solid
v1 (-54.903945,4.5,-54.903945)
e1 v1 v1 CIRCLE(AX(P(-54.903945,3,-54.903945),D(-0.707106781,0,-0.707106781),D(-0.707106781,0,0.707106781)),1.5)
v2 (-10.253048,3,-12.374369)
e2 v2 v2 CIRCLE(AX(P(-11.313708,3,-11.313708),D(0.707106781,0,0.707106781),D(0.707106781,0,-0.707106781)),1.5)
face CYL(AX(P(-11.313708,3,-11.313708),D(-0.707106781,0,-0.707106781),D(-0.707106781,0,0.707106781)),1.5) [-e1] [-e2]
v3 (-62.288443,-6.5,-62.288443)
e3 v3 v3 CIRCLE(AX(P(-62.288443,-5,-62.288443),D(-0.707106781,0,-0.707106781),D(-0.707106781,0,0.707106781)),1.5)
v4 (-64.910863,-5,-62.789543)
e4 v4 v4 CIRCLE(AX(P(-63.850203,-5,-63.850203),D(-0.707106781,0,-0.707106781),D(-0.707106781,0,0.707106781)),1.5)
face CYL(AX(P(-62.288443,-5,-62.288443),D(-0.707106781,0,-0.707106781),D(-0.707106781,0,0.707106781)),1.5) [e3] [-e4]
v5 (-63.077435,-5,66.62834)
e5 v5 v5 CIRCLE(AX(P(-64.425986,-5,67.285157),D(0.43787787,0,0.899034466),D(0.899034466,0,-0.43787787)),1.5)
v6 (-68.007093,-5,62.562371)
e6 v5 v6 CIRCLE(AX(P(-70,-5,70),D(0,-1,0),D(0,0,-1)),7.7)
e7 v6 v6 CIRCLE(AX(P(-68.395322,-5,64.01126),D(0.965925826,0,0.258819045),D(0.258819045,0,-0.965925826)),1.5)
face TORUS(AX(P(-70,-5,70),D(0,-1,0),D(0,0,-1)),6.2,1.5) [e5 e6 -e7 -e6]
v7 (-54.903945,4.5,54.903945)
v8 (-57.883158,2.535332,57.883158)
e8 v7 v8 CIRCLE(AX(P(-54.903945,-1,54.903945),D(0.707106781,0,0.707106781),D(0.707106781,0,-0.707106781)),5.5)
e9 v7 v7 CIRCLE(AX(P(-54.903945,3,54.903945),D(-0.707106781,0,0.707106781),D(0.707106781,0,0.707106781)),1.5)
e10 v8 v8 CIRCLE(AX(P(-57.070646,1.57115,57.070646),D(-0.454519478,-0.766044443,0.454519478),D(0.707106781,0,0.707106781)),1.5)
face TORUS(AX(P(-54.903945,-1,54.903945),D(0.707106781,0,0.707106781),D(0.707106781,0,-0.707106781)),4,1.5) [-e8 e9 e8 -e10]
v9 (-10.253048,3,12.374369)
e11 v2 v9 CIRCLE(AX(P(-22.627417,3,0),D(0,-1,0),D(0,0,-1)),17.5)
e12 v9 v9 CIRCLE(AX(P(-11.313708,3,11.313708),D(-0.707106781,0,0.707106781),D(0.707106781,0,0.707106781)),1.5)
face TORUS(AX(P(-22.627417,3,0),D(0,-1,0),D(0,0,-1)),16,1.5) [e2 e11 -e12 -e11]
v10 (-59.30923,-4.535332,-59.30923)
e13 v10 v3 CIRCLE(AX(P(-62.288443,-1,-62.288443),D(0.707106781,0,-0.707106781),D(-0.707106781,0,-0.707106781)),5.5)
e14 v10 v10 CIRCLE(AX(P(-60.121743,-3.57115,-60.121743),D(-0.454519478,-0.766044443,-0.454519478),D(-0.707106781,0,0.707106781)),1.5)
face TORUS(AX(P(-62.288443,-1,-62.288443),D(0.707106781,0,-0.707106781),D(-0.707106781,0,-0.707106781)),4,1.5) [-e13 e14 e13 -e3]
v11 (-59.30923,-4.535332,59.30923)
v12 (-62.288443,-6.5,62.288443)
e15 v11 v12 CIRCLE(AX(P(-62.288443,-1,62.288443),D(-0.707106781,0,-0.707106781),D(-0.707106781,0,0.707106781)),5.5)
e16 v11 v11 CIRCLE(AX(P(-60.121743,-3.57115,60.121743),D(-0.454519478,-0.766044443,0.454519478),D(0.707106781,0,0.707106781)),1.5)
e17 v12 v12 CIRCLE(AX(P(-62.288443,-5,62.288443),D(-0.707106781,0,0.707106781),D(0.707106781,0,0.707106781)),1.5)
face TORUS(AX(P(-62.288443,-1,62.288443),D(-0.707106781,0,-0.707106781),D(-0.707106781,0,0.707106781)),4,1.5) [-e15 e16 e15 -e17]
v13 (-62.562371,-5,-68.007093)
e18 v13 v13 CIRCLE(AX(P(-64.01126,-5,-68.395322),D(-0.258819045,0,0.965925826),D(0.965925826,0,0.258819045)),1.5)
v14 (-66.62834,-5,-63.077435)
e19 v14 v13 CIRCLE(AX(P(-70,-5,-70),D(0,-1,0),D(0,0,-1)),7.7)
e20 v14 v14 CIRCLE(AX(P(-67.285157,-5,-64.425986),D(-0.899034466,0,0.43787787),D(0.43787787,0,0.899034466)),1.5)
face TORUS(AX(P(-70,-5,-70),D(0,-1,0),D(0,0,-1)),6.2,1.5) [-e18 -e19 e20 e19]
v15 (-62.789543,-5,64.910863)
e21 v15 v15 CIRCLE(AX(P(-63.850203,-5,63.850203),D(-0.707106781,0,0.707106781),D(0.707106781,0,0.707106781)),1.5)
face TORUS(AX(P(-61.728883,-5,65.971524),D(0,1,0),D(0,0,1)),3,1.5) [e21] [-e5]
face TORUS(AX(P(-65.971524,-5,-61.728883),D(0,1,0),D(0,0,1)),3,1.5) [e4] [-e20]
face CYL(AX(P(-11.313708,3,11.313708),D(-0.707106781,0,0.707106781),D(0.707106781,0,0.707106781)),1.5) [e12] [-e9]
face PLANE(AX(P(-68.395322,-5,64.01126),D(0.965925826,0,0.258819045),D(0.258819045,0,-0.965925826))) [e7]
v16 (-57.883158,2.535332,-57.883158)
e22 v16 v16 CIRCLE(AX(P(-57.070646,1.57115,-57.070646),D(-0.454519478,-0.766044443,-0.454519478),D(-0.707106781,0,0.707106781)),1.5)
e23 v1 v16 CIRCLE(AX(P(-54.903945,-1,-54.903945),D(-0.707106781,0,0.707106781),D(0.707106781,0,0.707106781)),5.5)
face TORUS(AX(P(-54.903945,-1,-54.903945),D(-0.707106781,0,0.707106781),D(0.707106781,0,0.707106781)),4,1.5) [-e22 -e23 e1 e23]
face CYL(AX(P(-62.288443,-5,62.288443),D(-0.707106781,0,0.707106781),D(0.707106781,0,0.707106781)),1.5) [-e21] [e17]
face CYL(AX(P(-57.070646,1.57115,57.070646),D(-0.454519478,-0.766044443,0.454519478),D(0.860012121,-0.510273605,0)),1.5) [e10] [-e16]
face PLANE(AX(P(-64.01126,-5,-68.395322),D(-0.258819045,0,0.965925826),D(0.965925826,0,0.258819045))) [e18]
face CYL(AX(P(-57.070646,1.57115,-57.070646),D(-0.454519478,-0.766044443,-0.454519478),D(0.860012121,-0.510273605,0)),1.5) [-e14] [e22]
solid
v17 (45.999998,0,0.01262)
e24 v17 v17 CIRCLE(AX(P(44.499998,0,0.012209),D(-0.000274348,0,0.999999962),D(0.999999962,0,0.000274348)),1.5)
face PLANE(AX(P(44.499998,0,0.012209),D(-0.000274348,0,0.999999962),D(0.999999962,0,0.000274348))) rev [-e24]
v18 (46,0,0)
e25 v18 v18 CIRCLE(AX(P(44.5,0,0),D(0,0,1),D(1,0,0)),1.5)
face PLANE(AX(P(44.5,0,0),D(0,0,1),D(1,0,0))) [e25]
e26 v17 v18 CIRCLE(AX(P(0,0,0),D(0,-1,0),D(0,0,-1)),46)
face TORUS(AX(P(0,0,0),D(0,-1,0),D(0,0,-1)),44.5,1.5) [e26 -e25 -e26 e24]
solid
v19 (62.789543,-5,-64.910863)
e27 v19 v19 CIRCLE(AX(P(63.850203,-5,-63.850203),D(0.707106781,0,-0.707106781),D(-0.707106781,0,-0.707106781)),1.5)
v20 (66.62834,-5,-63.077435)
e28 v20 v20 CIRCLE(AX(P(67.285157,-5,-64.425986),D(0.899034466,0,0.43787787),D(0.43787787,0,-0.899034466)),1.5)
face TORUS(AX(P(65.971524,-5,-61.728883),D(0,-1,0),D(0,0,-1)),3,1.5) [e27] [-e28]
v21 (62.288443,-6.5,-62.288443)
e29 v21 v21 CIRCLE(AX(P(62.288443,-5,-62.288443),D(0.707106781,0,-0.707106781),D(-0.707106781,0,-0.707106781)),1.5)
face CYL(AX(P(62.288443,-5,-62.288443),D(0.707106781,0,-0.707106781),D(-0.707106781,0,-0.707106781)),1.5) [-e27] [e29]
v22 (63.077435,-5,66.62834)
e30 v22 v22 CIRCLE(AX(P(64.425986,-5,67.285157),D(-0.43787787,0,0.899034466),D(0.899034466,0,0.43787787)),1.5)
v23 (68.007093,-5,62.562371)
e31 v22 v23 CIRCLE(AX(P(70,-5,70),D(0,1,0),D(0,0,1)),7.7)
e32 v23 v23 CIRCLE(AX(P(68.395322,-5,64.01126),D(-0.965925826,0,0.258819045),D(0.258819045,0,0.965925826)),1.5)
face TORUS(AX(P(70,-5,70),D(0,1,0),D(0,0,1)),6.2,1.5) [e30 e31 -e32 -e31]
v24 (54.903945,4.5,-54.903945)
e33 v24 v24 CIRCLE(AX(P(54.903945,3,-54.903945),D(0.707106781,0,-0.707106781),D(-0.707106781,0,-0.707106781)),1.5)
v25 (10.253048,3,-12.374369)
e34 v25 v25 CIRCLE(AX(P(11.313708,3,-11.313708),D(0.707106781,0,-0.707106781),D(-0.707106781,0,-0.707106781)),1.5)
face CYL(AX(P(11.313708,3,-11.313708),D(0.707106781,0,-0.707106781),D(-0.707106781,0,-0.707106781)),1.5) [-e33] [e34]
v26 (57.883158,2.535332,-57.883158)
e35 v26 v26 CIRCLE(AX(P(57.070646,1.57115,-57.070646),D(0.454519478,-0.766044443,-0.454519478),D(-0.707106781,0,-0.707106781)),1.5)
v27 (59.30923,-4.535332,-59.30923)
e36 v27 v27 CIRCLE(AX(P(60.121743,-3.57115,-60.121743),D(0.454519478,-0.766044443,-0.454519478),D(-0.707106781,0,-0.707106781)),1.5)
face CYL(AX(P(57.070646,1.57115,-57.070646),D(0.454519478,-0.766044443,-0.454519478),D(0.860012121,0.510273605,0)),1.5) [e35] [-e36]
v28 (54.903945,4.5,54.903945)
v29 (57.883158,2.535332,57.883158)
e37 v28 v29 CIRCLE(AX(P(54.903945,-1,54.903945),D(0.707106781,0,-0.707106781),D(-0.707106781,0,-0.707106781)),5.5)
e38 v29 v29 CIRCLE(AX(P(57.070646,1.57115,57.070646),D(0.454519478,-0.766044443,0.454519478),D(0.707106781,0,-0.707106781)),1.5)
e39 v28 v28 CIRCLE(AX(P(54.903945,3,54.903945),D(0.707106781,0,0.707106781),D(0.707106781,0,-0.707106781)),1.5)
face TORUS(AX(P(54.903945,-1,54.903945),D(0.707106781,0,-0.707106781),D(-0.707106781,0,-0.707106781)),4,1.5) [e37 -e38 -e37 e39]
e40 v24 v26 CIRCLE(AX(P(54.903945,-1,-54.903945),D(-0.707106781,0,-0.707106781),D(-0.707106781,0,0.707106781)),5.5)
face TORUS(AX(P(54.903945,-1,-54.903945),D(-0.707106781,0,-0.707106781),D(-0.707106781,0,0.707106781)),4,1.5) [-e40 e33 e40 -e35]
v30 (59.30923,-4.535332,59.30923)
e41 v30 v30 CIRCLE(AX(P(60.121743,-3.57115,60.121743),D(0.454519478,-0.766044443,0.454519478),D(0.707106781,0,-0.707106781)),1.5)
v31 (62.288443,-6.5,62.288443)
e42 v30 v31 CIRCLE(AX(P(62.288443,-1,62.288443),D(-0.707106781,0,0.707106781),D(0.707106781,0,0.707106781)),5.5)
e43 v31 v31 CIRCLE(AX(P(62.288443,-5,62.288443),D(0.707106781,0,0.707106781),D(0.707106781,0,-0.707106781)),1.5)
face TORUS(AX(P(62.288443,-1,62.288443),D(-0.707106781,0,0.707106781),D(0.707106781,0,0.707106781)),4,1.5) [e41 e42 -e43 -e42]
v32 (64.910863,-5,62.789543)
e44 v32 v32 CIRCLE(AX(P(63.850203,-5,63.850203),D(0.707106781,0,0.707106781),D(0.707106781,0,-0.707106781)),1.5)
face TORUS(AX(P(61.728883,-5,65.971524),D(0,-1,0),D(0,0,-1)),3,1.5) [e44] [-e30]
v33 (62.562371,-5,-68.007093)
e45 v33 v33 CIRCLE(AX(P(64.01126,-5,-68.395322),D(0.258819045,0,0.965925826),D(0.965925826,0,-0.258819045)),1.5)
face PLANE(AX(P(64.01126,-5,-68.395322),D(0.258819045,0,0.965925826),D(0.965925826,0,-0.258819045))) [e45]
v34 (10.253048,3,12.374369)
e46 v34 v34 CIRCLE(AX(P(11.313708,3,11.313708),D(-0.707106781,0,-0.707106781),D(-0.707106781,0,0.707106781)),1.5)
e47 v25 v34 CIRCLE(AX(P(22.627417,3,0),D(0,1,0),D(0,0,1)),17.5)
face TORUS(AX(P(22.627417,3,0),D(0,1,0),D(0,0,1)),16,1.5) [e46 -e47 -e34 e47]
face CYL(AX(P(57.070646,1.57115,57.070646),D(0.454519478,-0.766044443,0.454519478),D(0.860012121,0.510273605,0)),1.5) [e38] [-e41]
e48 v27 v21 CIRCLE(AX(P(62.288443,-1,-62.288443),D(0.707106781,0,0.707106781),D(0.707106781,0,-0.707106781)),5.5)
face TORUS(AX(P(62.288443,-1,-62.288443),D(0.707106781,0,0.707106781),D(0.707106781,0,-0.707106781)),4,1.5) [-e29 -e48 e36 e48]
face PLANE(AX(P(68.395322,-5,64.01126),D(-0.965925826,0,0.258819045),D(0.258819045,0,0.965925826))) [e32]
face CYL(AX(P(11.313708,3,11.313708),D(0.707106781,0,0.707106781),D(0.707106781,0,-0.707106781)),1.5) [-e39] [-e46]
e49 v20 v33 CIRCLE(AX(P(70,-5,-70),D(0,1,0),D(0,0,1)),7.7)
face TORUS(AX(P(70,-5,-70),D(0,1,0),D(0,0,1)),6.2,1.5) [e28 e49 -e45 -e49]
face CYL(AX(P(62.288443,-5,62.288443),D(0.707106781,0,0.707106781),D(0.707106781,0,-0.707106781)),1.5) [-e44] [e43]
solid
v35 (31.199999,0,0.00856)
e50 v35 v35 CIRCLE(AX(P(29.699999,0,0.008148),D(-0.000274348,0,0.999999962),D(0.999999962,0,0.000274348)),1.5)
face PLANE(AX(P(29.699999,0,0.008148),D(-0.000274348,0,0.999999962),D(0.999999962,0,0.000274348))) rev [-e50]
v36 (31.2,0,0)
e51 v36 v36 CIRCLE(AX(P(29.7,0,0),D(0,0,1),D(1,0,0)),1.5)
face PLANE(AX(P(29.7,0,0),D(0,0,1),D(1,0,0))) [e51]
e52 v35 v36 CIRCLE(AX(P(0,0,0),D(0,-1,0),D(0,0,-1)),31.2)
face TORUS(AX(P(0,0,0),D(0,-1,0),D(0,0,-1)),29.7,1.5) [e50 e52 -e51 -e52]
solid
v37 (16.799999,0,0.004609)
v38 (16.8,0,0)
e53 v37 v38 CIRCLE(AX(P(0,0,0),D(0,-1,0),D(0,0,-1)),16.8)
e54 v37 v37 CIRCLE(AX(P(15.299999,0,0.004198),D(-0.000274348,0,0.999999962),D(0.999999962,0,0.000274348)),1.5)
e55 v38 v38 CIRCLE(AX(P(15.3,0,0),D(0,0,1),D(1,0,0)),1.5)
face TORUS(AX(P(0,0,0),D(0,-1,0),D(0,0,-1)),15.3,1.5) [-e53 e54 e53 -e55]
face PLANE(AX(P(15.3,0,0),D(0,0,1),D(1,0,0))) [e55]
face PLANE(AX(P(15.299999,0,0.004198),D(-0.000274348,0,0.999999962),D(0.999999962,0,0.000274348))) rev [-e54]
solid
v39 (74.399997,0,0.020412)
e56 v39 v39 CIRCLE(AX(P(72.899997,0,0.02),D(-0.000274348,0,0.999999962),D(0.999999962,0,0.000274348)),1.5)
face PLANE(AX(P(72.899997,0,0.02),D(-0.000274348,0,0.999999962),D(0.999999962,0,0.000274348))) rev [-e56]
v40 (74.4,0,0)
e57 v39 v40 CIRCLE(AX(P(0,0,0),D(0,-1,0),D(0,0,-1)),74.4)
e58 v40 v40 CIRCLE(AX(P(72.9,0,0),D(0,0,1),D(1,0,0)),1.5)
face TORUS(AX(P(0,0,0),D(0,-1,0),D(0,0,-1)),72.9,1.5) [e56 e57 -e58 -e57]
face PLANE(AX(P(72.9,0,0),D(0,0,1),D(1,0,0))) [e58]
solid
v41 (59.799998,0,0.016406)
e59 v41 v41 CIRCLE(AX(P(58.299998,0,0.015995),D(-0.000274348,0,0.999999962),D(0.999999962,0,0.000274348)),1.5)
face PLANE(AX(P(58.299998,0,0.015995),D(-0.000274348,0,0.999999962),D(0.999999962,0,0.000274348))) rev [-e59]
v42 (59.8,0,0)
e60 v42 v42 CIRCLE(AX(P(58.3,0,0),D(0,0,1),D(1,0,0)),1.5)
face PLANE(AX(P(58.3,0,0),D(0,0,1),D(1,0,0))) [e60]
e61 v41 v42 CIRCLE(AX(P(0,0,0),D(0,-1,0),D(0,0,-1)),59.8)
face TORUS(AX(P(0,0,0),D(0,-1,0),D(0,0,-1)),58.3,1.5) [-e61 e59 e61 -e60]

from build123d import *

# Parameters (mm, degrees)
BALAYAGE2_OUTLINE_R = 0.75
BALAYAGE2_ANGLE     = 359.984281
ESQUISSE4_R         = 0.75
ESQUISSE5_R         = 0.75
ESQUISSE7_R         = 0.75
ESQUISSE8_R         = 0.75
ESQUISSE11_R        = 0.75
ESQUISSE13_R        = 0.75
ESQUISSE19_R        = 0.75
ESQUISSE15_R        = 0.75
ESQUISSE20_R        = 0.75
ESQUISSE21_R        = 0.75
ESCALA2_SCALE       = 2


# Read off the part's stored shape, not the designer's step: Balayage2
with BuildPart() as part:
    # Balayage2 outline → Balayage2 (revolve)
    with BuildSketch(Plane.XY):
        with Locations((36.45, 0)):
            Circle(BALAYAGE2_OUTLINE_R)
        with Locations((29.15, 0)):
            Circle(BALAYAGE2_OUTLINE_R)
        with Locations((22.25, 0)):
            Circle(BALAYAGE2_OUTLINE_R)
        with Locations((14.85, 0)):
            Circle(BALAYAGE2_OUTLINE_R)
        with Locations((7.65, 0)):
            Circle(BALAYAGE2_OUTLINE_R)
    revolve(axis=Axis((0, 0, 0), (0, 1, 0)), revolution_arc=BALAYAGE2_ANGLE)


with BuildPart() as body_2:
    # Balayage3: sweep along a path in Esquisse3
    with BuildLine(Plane(origin=(0, 1.5, 0), x_dir=(-1, 0, 0), z_dir=(0, 1, 0))) as balayage3_path:
        Line((-27, -27), (-5.656854249, -5.656854249))
        ThreePointArc((-5.656854249, -5.656854249), (-3.313708499, 0), (-5.656854249, 5.656854249))
        Line((-5.656854249, 5.656854249), (-27, 27))
    # Esquisse4 → Balayage3 (sweep)
    with BuildSketch(Plane(origin=(27, 0, -27), x_dir=(-0.7071067811865488, 0, -0.7071067811865462), z_dir=(0.7071067811865462, 0, -0.7071067811865488))):
        with Locations((0, 1.5)):
            Circle(ESQUISSE4_R)
    sweep(path=balayage3_path.line)

    # Balayage14: sweep along a path in Esquisse9
    with BuildLine(Plane(origin=(0, 0, 0), x_dir=(0.7071067811865488, 0, -0.7071067811865462), z_dir=(0.7071067811865462, 0, 0.7071067811865488))) as balayage14_path:
        Line((38.183766184, 1.5), (38.822951605, 1.5))
        ThreePointArc((38.822951605, 1.5), (39.668188129, 1.312615574), (40.355040492, 0.785575219))
        Line((40.355040492, 0.785575219), (42.512491877, -1.785575219))
        ThreePointArc((42.512491877, -1.785575219), (43.199344239, -2.312615574), (44.044580763, -2.5))
        Line((44.044580763, -2.5), (44.683766184, -2.5))
    # Esquisse8 → Balayage14 (sweep)
    with BuildSketch(Plane(origin=(27, 0, -27), x_dir=(-0.7071067811865488, 0, -0.7071067811865462), z_dir=(0.7071067811865462, 0, -0.7071067811865488))):
        with Locations((0, 1.5)):
            Circle(ESQUISSE8_R)
    sweep(path=balayage14_path.line)

    # Balayage16: sweep along a path in Esquisse12
    with BuildLine(Plane(origin=(0, 0, 0), x_dir=(-0.7071067811865488, 0, -0.7071067811865462), z_dir=(0.7071067811865462, 0, -0.7071067811865488))) as balayage16_path:
        Line((-38.183766184, 1.5), (-38.822951605, 1.5))
        ThreePointArc((-38.822951605, 1.5), (-39.668188129, 1.312615574), (-40.355040492, 0.785575219))
        Line((-40.355040492, 0.785575219), (-42.512491877, -1.785575219))
        ThreePointArc((-42.512491877, -1.785575219), (-43.199344239, -2.312615574), (-44.044580763, -2.5))
        Line((-44.044580763, -2.5), (-44.683766184, -2.5))
    # Esquisse13 → Balayage16 (sweep)
    with BuildSketch(Plane(origin=(27, 0, 27), x_dir=(0.7071067811865457, 0, -0.7071067811865495), z_dir=(0.7071067811865495, 0, 0.7071067811865457))):
        with Locations((0, 1.5)):
            Circle(ESQUISSE13_R)
    sweep(path=balayage16_path.line)

    # Balayage18: sweep along a path in Esquisse16
    with BuildLine(Plane(origin=(0, -2.5, 0), x_dir=(-1, 0, 0), z_dir=(0, 1, 0))) as balayage18_path:
        Line((-31.596194078, 31.596194078), (-31.925101628, 31.925101628))
        ThreePointArc((-31.925101628, 31.925101628), (-32.343801875, 32.737784484), (-32.212993155, 33.642578604))
        ThreePointArc((-32.212993155, 33.642578604), (-36.972498721, 37.391495096), (-34.19766096, 32.005629939))
    # Esquisse19 → Balayage18 (sweep)
    with BuildSketch(Plane(origin=(31.596194078, 0, 31.596194078), x_dir=(0.7071067811865456, 0, -0.7071067811865495), z_dir=(0.7071067811865495, 0, 0.7071067811865456))):
        with Locations((0, -2.5)):
            Circle(ESQUISSE19_R)
    sweep(path=balayage18_path.line)

    # Balayage20: sweep along a path in Esquisse17
    with BuildLine(Plane(origin=(0, -2.5, 0), x_dir=(-1, 0, 0), z_dir=(0, 1, 0))) as balayage20_path:
        Line((-31.596194078, -31.596194078), (-31.925101628, -31.925101628))
        ThreePointArc((-31.925101628, -31.925101628), (-32.737784484, -32.343801875), (-33.642578604, -32.212993155))
        ThreePointArc((-33.642578604, -32.212993155), (-37.391495096, -36.972498721), (-32.005629939, -34.19766096))
    # Esquisse20 → Balayage20 (sweep)
    with BuildSketch(Plane(origin=(31.596194078, 0, -31.596194078), x_dir=(-0.7071067811865488, 0, -0.7071067811865462), z_dir=(0.7071067811865462, 0, -0.7071067811865488))):
        with Locations((0, -2.5)):
            Circle(ESQUISSE20_R)
    sweep(path=balayage20_path.line)


with BuildPart() as body_3:
    # Balayage6: sweep along a path in Esquisse3<5>
    with BuildLine(Plane(origin=(0, 1.5, 0), x_dir=(-1, 0, 0), z_dir=(0, 1, 0))) as balayage6_path:
        Line((27, 27), (5.656854249, 5.656854249))
        ThreePointArc((5.656854249, 5.656854249), (3.313708499, 0), (5.656854249, -5.656854249))
        Line((5.656854249, -5.656854249), (27, -27))
    # Esquisse5 → Balayage6 (sweep)
    with BuildSketch(Plane(origin=(-27, 0, -27), x_dir=(0.7071067811865488, 0, -0.7071067811865462), z_dir=(0.7071067811865462, 0, 0.7071067811865488))):
        with Locations((0, 1.5)):
            Circle(ESQUISSE5_R)
    sweep(path=balayage6_path.line)

    # Balayage8: sweep along a path in Esquisse6
    with BuildLine(Plane(origin=(0, 0, 0), x_dir=(0.7071067811865488, 0, -0.7071067811865462), z_dir=(0.7071067811865462, 0, 0.7071067811865488))) as balayage8_path:
        Line((-38.183766184, 1.5), (-38.822951605, 1.5))
        ThreePointArc((-38.822951605, 1.5), (-39.668188129, 1.312615574), (-40.355040492, 0.785575219))
        Line((-40.355040492, 0.785575219), (-42.512491877, -1.785575219))
        ThreePointArc((-42.512491877, -1.785575219), (-43.199344239, -2.312615574), (-44.044580763, -2.5))
        Line((-44.044580763, -2.5), (-44.683766184, -2.5))
    # Esquisse7 → Balayage8 (sweep)
    with BuildSketch(Plane(origin=(-27, 0, 27), x_dir=(0.7071067811865449, 0, 0.7071067811865502), z_dir=(-0.7071067811865502, 0, 0.7071067811865449))):
        with Locations((0, 1.5)):
            Circle(ESQUISSE7_R)
    sweep(path=balayage8_path.line)

    # Balayage15: sweep along a path in Esquisse10
    with BuildLine(Plane(origin=(0, 0, 0), x_dir=(-0.7071067811865488, 0, -0.7071067811865462), z_dir=(0.7071067811865462, 0, -0.7071067811865488))) as balayage15_path:
        Line((38.183766184, 1.5), (38.822951605, 1.5))
        ThreePointArc((38.822951605, 1.5), (39.668188129, 1.312615574), (40.355040492, 0.785575219))
        Line((40.355040492, 0.785575219), (42.512491877, -1.785575219))
        ThreePointArc((42.512491877, -1.785575219), (43.199344239, -2.312615574), (44.044580763, -2.5))
        Line((44.044580763, -2.5), (44.683766184, -2.5))
    # Esquisse11 → Balayage15 (sweep)
    with BuildSketch(Plane(origin=(-27, 0, -27), x_dir=(-0.7071067811865488, 0, 0.7071067811865462), z_dir=(-0.7071067811865462, 0, -0.7071067811865488))):
        with Locations((0, 1.5)):
            Circle(ESQUISSE11_R)
    sweep(path=balayage15_path.line)

    # Balayage19: sweep along a path in Esquisse14
    with BuildLine(Plane(origin=(0, -2.5, 0), x_dir=(-1, 0, 0), z_dir=(0, 1, 0))) as balayage19_path:
        Line((31.596194078, 31.596194078), (31.925101628, 31.925101628))
        ThreePointArc((31.925101628, 31.925101628), (32.343801875, 32.737784484), (32.212993155, 33.642578604))
        ThreePointArc((32.212993155, 33.642578604), (36.972498721, 37.391495096), (34.19766096, 32.005629939))
    # Esquisse15 → Balayage19 (sweep)
    with BuildSketch(Plane(origin=(-31.596194078, 0, 31.596194078), x_dir=(0.7071067811865449, 0, 0.7071067811865501), z_dir=(-0.7071067811865501, 0, 0.7071067811865449))):
        with Locations((0, -2.5)):
            Circle(ESQUISSE15_R)
    sweep(path=balayage19_path.line)

    # Balayage21: sweep along a path in Esquisse18
    with BuildLine(Plane(origin=(0, -2.5, 0), x_dir=(-1, 0, 0), z_dir=(0, 1, 0))) as balayage21_path:
        Line((31.596194078, -31.596194078), (31.925101628, -31.925101628))
        ThreePointArc((31.925101628, -31.925101628), (32.737784484, -32.343801875), (33.642578604, -32.212993155))
        ThreePointArc((33.642578604, -32.212993155), (37.391495096, -36.972498721), (32.005629939, -34.19766096))
    # Esquisse21 → Balayage21 (sweep)
    with BuildSketch(Plane(origin=(-31.596194078, 0, -31.596194078), x_dir=(-0.7071067811865488, 0, 0.7071067811865462), z_dir=(-0.7071067811865462, 0, -0.7071067811865488))):
        with Locations((0, -2.5)):
            Circle(ESQUISSE21_R)
    sweep(path=balayage21_path.line)


with BuildPart() as part_1:
    # Escala2: scaled about (0, 0, 0)
    add(part.part.scale(ESCALA2_SCALE))


with BuildPart() as body_3_1:
    # Escala2: scaled about (0, 0, 0)
    add(body_3.part.scale(ESCALA2_SCALE))


with BuildPart() as body_2_1:
    # Escala2: scaled about (0, 0, 0)
    add(body_2.part.scale(ESCALA2_SCALE))


solid = Compound([part_1.part, body_3_1.part, body_2_1.part])
